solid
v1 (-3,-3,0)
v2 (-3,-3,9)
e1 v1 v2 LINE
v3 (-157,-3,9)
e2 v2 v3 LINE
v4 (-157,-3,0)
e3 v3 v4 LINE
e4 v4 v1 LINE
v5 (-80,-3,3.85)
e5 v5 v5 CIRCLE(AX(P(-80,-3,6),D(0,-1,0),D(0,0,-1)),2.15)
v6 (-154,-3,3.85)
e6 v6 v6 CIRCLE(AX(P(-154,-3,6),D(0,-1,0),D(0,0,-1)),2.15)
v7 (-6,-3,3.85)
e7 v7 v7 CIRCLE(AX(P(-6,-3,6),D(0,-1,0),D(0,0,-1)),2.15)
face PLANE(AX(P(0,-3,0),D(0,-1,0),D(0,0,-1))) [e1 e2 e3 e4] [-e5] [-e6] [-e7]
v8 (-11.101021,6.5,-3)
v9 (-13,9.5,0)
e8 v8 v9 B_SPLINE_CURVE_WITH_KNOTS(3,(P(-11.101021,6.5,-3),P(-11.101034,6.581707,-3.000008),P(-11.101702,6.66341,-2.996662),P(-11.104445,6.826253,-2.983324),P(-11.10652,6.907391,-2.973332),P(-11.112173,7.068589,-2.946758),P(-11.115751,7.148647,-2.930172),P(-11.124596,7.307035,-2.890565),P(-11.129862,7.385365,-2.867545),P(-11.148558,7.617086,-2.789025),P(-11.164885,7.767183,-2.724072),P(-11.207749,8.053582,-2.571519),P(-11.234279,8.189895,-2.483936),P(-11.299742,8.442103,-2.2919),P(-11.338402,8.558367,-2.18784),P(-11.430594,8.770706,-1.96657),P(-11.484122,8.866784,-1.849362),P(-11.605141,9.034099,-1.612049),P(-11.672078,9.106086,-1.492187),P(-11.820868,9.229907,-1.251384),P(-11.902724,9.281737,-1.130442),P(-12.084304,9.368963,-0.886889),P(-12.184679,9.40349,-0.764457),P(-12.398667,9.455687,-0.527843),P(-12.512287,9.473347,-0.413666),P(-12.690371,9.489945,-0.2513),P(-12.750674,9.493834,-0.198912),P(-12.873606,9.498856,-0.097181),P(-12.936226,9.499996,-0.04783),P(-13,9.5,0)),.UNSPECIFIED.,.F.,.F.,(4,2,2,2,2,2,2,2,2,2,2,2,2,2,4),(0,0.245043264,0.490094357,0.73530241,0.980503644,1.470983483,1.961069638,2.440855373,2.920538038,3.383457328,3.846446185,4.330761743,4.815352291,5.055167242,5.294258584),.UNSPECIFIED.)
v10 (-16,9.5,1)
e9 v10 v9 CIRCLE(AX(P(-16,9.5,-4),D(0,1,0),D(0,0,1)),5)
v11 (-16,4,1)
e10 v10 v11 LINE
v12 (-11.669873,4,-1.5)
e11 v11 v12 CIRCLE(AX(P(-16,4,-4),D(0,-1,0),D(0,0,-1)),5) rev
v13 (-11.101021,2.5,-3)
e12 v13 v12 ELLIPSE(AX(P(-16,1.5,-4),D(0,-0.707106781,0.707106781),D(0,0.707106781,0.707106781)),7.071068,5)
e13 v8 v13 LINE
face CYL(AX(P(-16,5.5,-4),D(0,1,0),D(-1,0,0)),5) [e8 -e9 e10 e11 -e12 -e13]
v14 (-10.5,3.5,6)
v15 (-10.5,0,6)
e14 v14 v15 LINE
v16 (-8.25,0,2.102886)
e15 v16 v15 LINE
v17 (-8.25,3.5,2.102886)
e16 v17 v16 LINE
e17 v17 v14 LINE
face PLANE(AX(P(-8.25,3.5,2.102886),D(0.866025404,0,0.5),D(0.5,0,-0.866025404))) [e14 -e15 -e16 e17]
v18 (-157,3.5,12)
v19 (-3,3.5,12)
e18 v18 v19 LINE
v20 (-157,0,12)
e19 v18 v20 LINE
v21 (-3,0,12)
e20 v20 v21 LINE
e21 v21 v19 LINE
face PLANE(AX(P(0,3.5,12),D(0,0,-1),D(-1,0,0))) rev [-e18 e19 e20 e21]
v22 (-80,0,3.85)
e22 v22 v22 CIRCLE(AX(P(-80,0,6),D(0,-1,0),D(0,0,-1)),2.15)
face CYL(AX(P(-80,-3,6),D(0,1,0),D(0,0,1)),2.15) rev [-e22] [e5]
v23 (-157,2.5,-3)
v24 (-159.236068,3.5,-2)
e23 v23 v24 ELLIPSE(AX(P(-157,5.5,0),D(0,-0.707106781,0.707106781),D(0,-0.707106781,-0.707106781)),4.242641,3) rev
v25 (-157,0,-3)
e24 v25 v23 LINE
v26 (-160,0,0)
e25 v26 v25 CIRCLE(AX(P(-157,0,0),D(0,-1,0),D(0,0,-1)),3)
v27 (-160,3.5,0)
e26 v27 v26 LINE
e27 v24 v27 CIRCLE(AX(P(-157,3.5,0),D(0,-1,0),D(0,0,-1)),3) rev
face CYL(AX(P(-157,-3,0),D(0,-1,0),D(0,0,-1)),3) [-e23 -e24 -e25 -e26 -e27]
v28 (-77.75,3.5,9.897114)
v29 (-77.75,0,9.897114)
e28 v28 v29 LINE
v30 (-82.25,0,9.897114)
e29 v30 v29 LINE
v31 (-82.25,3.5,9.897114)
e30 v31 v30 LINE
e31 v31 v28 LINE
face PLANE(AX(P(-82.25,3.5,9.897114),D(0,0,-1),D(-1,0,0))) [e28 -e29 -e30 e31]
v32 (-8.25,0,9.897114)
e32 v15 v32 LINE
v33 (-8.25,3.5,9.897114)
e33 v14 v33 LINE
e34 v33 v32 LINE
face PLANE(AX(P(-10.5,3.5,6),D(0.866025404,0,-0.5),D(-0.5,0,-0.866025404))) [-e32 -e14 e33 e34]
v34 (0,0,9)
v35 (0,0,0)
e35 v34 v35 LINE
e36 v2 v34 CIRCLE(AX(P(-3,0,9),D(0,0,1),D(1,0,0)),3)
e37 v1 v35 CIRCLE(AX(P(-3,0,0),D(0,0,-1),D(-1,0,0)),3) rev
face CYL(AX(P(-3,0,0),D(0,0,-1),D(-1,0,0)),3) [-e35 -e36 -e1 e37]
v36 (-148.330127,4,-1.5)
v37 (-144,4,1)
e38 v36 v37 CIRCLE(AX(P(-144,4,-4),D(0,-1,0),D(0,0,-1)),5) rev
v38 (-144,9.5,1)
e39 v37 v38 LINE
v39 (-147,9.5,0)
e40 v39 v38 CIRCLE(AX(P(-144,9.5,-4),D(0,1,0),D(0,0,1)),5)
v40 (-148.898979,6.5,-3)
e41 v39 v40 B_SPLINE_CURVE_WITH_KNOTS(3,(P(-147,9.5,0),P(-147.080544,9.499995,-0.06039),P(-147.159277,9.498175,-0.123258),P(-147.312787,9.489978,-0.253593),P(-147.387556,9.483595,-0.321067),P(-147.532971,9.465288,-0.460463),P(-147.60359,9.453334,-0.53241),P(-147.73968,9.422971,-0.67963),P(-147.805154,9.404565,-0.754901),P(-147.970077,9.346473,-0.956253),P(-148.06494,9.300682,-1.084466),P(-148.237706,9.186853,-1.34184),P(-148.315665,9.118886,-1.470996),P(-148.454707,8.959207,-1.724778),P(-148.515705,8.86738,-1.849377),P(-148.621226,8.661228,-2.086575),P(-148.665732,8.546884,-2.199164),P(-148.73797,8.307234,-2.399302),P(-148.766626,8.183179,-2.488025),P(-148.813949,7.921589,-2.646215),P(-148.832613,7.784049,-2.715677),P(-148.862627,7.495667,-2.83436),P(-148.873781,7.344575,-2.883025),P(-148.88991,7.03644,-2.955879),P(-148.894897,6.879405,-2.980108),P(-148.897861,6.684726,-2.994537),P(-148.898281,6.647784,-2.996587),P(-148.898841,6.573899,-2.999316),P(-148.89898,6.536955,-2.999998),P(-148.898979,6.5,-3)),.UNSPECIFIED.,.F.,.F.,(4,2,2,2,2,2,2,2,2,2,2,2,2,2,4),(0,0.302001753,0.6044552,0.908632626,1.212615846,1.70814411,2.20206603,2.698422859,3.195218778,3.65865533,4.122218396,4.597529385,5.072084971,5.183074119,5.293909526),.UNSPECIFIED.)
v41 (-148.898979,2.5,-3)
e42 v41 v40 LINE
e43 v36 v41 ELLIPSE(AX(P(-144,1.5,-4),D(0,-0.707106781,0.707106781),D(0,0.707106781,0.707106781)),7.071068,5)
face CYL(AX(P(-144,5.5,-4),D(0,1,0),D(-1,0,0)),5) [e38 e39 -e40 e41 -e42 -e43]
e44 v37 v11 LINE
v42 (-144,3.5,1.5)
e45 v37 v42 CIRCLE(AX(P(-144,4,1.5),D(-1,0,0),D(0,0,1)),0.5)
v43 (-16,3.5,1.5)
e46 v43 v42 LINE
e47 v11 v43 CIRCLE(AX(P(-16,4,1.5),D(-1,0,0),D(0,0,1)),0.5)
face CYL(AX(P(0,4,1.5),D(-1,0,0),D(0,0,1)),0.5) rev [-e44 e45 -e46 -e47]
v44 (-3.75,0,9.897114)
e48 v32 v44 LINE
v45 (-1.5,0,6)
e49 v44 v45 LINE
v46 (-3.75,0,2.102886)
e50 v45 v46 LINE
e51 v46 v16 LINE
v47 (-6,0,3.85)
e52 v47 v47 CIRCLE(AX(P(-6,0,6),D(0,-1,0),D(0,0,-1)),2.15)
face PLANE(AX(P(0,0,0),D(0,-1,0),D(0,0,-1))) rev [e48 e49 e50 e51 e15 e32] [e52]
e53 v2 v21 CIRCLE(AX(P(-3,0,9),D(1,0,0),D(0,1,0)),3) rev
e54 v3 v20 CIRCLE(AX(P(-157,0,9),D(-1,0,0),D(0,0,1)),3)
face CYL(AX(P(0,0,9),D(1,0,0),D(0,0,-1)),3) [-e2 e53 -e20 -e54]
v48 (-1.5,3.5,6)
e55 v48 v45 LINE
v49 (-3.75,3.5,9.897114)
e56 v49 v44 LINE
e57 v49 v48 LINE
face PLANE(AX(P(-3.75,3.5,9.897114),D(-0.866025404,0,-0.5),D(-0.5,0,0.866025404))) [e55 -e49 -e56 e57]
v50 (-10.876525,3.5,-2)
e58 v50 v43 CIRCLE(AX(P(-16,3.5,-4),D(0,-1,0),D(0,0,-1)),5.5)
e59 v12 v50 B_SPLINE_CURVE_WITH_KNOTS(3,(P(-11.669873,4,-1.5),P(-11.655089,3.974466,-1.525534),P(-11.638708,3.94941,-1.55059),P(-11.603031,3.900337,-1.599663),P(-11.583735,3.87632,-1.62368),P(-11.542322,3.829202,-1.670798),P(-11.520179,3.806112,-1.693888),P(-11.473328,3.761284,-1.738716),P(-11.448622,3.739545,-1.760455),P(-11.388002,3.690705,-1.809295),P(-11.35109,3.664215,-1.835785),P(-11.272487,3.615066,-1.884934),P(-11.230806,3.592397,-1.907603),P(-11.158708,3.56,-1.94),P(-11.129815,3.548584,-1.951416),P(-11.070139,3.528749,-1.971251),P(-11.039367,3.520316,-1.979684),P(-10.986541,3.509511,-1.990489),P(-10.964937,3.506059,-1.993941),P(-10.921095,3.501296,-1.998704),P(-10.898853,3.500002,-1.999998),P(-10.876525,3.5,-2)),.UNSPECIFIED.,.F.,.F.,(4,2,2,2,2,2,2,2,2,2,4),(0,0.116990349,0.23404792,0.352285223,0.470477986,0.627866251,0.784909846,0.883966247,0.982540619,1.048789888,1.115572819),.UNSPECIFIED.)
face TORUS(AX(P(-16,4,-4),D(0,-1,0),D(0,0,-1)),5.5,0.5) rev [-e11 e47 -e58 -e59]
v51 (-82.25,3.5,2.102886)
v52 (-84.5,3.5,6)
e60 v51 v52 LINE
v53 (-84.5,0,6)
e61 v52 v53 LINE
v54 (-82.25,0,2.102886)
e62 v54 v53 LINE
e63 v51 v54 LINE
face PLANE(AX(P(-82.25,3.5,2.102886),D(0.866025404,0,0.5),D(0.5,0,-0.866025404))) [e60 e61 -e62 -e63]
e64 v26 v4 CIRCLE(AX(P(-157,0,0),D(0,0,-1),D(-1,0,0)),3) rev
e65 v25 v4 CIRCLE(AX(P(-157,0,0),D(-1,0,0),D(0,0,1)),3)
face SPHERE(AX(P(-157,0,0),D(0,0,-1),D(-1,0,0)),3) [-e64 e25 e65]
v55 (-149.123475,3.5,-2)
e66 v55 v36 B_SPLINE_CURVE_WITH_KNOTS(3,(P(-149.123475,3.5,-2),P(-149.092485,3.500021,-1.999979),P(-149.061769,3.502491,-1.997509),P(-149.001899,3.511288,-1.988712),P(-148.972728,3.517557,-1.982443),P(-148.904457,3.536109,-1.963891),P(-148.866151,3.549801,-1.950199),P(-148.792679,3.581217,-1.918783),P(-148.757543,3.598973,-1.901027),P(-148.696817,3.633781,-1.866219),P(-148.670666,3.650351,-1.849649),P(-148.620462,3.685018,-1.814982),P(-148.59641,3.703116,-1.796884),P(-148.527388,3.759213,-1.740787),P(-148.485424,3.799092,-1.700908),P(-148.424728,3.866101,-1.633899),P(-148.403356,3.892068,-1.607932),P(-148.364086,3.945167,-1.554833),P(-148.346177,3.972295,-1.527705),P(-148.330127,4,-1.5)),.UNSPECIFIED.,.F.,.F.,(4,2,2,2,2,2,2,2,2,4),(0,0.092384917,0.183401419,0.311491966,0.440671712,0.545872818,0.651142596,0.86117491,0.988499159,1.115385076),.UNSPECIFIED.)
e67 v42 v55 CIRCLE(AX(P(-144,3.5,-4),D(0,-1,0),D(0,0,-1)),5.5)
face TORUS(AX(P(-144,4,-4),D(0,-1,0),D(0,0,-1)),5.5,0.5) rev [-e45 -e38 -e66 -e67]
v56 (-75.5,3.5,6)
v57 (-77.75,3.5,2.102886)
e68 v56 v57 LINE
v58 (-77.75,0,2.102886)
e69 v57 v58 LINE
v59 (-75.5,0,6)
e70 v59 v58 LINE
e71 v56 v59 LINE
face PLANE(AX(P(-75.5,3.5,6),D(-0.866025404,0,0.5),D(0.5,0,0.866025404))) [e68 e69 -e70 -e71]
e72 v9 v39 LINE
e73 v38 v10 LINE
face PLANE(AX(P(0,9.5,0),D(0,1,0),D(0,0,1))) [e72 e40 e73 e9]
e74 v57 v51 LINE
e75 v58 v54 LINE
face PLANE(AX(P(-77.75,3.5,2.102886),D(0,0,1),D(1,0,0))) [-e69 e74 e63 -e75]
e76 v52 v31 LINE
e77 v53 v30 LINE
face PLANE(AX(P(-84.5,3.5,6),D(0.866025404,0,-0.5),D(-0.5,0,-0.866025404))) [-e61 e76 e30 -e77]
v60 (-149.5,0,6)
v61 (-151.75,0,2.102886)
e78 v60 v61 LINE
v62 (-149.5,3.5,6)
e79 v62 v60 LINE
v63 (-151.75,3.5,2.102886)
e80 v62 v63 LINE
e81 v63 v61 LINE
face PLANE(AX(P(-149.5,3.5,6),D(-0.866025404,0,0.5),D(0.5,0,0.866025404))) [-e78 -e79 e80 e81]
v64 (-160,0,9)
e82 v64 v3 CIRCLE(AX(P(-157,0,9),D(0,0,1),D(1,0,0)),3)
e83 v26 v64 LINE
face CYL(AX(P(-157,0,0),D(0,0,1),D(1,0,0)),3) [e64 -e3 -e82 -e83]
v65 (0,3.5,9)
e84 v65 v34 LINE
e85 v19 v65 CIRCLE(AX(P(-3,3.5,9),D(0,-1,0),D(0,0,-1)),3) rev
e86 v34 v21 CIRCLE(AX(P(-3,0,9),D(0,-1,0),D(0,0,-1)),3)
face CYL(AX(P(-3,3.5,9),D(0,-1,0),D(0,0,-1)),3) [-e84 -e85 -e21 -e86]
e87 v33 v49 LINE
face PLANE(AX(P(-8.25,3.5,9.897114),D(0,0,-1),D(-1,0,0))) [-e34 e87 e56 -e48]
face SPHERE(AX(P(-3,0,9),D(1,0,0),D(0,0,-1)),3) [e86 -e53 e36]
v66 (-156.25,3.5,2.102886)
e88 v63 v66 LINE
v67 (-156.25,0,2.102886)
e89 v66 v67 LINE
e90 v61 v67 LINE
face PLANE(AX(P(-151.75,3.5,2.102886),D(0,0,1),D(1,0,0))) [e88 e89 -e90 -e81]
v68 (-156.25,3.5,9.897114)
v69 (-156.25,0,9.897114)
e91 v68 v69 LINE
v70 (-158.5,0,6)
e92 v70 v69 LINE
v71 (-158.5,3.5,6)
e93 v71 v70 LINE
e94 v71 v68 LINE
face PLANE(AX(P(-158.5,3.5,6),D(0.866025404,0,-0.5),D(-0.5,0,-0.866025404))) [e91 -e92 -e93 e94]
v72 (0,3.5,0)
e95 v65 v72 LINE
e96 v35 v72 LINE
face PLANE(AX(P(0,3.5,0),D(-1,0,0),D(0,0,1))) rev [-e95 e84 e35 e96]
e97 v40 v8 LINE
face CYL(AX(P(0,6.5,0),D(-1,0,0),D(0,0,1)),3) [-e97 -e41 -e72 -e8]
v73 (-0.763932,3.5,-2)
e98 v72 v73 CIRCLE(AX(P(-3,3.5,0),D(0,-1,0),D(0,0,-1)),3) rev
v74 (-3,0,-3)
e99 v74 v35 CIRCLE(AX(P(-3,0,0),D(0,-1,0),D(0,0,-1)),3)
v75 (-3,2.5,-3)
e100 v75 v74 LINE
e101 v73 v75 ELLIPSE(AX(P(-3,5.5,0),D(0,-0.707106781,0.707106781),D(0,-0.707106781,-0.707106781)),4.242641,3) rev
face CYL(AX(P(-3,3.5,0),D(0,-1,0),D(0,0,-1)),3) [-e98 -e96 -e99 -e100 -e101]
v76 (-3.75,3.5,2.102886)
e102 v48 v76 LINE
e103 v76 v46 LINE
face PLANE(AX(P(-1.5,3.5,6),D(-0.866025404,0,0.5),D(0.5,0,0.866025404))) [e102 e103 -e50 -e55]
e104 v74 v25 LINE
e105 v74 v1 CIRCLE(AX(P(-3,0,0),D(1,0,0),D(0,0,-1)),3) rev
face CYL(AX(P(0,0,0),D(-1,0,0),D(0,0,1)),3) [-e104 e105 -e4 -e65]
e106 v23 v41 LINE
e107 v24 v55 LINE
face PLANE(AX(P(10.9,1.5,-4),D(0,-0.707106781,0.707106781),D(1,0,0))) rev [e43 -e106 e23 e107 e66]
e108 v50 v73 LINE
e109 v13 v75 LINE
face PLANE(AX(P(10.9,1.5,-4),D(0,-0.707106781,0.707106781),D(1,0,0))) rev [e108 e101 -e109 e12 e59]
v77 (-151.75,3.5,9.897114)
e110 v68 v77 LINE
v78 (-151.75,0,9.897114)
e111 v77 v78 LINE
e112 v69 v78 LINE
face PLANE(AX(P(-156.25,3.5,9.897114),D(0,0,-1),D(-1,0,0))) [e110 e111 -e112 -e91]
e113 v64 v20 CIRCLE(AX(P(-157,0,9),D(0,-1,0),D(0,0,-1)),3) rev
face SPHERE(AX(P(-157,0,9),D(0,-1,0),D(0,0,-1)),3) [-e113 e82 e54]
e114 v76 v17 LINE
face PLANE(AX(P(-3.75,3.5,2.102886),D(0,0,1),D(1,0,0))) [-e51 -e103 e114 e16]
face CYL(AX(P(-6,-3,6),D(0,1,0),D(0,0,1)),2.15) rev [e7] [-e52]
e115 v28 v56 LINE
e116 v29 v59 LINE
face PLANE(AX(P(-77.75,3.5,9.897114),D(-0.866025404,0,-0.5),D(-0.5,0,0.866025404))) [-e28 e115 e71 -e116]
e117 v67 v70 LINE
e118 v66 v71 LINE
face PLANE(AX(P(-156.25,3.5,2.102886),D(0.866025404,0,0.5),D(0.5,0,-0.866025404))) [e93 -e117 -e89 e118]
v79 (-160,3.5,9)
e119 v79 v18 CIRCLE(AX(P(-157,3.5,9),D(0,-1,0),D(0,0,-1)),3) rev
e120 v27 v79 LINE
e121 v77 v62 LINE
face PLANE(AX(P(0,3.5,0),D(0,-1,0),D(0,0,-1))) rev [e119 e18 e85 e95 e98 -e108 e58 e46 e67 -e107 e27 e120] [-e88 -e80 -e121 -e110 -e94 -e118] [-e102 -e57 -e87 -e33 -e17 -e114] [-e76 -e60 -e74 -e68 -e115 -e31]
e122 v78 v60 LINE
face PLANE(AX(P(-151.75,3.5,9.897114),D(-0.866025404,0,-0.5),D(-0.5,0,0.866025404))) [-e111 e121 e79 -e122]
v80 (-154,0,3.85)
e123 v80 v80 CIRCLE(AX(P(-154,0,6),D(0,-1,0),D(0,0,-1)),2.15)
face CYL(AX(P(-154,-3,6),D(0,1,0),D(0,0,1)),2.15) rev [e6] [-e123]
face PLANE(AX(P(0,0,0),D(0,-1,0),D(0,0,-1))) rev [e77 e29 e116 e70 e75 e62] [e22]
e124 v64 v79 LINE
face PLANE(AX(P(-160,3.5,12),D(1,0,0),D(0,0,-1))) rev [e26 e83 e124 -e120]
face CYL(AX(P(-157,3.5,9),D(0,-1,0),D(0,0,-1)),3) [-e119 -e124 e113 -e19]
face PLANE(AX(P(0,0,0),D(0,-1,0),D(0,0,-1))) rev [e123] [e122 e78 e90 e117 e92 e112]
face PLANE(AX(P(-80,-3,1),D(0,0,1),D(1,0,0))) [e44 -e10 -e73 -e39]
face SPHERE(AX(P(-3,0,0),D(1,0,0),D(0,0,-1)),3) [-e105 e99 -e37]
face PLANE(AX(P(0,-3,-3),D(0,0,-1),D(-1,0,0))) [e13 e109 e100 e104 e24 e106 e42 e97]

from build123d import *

# Parameters (mm, degrees)
SKETCH1_W                = 160
SKETCH1_H                = 12
BOSS_EXTRUDE1_DEPTH      = 3.5
SKETCH2_W                = 160
SKETCH2_H                = 12
SKETCH2_R                = 2.15
BOSS_EXTRUDE2_DEPTH      = 3
BOSS_EXTRUDE3_DEPTH      = 6
BOSS_EXTRUDE3_DEPTH_BACK = 6.5
CAVITY1_START            = 2.5
CAVITY1_DEPTH            = 7.5
CAVITY1_START_2          = -160
CAVITY1_2_DEPTH          = 160
FILLET2_R                = 3
FILLET3_R                = 3
FILLET4_R                = 0.5


with BuildPart() as part:
    # Sketch1 → Boss-Extrude1 (new body)
    with BuildSketch(Plane(origin=(0, 0, 0), x_dir=(1, 0, 0), z_dir=(0, 1, 0))):
        with Locations((-80, -6)):
            Rectangle(SKETCH1_W, SKETCH1_H)
        Polygon((-75.5, -6), (-77.75, -2.102885683), (-82.25, -2.102885683), (-84.5, -6), (-82.25, -9.897114317), (-77.75, -9.897114317), align=None, mode=Mode.SUBTRACT)
        Polygon((-149.5, -6), (-151.75, -2.102885683), (-156.25, -2.102885683), (-158.5, -6), (-156.25, -9.897114317), (-151.75, -9.897114317), align=None, mode=Mode.SUBTRACT)
        Polygon((-10.5, -6), (-8.25, -9.897114317), (-3.75, -9.897114317), (-1.5, -6), (-3.75, -2.102885683), (-8.25, -2.102885683), align=None, mode=Mode.SUBTRACT)
    extrude(amount=BOSS_EXTRUDE1_DEPTH)

    # Sketch2 → Boss-Extrude2 (add)
    with BuildSketch(Plane.XZ):
        with Locations((-80, 6)):
            Rectangle(SKETCH2_W, SKETCH2_H)
        with Locations(Location((-154, 6, 0), (0, 0, 270))):
            Circle(SKETCH2_R, mode=Mode.SUBTRACT)
        with Locations(Location((-80, 6, 0), (0, 0, 270))):
            Circle(SKETCH2_R, mode=Mode.SUBTRACT)
        with Locations(Location((-6, 6, 0), (0, 0, 270))):
            Circle(SKETCH2_R, mode=Mode.SUBTRACT)
    extrude(amount=BOSS_EXTRUDE2_DEPTH)

    # Sketch3 → Boss-Extrude3 (add, two sides: drawn at the far end of the back side and taken through both)
    with BuildSketch(Plane(origin=(0, 3.5, 0), x_dir=(1, 0, 0), z_dir=(0, 1, 0)).offset(-BOSS_EXTRUDE3_DEPTH_BACK)):
        Polygon((-80, -1), (0, -1), (0, 3), (-160, 3), (-160, -1), align=None)
    extrude(amount=BOSS_EXTRUDE3_DEPTH + BOSS_EXTRUDE3_DEPTH_BACK)

    # Cavity1: read off the stored shape, not the designer's step
    # Cavity1 outline → Cavity1 (cut)
    with BuildSketch(Plane(origin=(0, 0, 0), x_dir=(1, 0, 0), z_dir=(0, 1, 0)).offset(CAVITY1_START)):
        with BuildLine():
            ThreePointArc((-11.101020514, 3), (-12.83772234, 0.127016654), (-16, -1))
            Line((-16, -1), (0, -1))
            Line((0, -1), (0, 3))
            Line((0, 3), (-11.101020514, 3))
        make_face()
        with BuildLine():
            Line((-160, -1), (-144, -1))
            ThreePointArc((-144, -1), (-147.16227766, 0.127016654), (-148.898979486, 3))
            Line((-148.898979486, 3), (-160, 3))
            Line((-160, 3), (-160, -1))
        make_face()
    extrude(amount=CAVITY1_DEPTH, mode=Mode.SUBTRACT)

    # Cavity1 2 outline → Cavity1 2 (add)
    with BuildSketch(Plane.YZ.offset(CAVITY1_START_2)):
        Polygon((2.5, -3), (3.5, -2), (3.5, 1), (2.5, 1), align=None)
    extrude(amount=CAVITY1_2_DEPTH)

    # Fillet2
    fillet2_edges = [part.edges().sort_by_distance(p)[0] for p in [
        (-80, 9.5, -3),
    ]]
    fillet(fillet2_edges, radius=FILLET2_R)

    # Fillet3
    fillet3_edges = [part.edges().sort_by_distance(p)[0] for p in [
        (-80, -3, 12),
        (0, -3, 4.5),
        (-160, -3, 4.5),
        (-160, -0.25, -3),
        (-80, -3, -3),
        (0, -0.25, -3),
        (-160, 0.25, 12),
        (0, 0.25, 12),
    ]]
    fillet(fillet3_edges, radius=FILLET3_R)

    # Fillet4
    fillet4_edges = [part.edges().sort_by_distance(p)[0] for p in [
        (-80, 3.5, 1),
        (-146.738612787, 3.5, 0.183300132),
        (-13.261387213, 3.5, 0.183300132),
    ]]
    fillet(fillet4_edges, radius=FILLET4_R)


solid = part.part
